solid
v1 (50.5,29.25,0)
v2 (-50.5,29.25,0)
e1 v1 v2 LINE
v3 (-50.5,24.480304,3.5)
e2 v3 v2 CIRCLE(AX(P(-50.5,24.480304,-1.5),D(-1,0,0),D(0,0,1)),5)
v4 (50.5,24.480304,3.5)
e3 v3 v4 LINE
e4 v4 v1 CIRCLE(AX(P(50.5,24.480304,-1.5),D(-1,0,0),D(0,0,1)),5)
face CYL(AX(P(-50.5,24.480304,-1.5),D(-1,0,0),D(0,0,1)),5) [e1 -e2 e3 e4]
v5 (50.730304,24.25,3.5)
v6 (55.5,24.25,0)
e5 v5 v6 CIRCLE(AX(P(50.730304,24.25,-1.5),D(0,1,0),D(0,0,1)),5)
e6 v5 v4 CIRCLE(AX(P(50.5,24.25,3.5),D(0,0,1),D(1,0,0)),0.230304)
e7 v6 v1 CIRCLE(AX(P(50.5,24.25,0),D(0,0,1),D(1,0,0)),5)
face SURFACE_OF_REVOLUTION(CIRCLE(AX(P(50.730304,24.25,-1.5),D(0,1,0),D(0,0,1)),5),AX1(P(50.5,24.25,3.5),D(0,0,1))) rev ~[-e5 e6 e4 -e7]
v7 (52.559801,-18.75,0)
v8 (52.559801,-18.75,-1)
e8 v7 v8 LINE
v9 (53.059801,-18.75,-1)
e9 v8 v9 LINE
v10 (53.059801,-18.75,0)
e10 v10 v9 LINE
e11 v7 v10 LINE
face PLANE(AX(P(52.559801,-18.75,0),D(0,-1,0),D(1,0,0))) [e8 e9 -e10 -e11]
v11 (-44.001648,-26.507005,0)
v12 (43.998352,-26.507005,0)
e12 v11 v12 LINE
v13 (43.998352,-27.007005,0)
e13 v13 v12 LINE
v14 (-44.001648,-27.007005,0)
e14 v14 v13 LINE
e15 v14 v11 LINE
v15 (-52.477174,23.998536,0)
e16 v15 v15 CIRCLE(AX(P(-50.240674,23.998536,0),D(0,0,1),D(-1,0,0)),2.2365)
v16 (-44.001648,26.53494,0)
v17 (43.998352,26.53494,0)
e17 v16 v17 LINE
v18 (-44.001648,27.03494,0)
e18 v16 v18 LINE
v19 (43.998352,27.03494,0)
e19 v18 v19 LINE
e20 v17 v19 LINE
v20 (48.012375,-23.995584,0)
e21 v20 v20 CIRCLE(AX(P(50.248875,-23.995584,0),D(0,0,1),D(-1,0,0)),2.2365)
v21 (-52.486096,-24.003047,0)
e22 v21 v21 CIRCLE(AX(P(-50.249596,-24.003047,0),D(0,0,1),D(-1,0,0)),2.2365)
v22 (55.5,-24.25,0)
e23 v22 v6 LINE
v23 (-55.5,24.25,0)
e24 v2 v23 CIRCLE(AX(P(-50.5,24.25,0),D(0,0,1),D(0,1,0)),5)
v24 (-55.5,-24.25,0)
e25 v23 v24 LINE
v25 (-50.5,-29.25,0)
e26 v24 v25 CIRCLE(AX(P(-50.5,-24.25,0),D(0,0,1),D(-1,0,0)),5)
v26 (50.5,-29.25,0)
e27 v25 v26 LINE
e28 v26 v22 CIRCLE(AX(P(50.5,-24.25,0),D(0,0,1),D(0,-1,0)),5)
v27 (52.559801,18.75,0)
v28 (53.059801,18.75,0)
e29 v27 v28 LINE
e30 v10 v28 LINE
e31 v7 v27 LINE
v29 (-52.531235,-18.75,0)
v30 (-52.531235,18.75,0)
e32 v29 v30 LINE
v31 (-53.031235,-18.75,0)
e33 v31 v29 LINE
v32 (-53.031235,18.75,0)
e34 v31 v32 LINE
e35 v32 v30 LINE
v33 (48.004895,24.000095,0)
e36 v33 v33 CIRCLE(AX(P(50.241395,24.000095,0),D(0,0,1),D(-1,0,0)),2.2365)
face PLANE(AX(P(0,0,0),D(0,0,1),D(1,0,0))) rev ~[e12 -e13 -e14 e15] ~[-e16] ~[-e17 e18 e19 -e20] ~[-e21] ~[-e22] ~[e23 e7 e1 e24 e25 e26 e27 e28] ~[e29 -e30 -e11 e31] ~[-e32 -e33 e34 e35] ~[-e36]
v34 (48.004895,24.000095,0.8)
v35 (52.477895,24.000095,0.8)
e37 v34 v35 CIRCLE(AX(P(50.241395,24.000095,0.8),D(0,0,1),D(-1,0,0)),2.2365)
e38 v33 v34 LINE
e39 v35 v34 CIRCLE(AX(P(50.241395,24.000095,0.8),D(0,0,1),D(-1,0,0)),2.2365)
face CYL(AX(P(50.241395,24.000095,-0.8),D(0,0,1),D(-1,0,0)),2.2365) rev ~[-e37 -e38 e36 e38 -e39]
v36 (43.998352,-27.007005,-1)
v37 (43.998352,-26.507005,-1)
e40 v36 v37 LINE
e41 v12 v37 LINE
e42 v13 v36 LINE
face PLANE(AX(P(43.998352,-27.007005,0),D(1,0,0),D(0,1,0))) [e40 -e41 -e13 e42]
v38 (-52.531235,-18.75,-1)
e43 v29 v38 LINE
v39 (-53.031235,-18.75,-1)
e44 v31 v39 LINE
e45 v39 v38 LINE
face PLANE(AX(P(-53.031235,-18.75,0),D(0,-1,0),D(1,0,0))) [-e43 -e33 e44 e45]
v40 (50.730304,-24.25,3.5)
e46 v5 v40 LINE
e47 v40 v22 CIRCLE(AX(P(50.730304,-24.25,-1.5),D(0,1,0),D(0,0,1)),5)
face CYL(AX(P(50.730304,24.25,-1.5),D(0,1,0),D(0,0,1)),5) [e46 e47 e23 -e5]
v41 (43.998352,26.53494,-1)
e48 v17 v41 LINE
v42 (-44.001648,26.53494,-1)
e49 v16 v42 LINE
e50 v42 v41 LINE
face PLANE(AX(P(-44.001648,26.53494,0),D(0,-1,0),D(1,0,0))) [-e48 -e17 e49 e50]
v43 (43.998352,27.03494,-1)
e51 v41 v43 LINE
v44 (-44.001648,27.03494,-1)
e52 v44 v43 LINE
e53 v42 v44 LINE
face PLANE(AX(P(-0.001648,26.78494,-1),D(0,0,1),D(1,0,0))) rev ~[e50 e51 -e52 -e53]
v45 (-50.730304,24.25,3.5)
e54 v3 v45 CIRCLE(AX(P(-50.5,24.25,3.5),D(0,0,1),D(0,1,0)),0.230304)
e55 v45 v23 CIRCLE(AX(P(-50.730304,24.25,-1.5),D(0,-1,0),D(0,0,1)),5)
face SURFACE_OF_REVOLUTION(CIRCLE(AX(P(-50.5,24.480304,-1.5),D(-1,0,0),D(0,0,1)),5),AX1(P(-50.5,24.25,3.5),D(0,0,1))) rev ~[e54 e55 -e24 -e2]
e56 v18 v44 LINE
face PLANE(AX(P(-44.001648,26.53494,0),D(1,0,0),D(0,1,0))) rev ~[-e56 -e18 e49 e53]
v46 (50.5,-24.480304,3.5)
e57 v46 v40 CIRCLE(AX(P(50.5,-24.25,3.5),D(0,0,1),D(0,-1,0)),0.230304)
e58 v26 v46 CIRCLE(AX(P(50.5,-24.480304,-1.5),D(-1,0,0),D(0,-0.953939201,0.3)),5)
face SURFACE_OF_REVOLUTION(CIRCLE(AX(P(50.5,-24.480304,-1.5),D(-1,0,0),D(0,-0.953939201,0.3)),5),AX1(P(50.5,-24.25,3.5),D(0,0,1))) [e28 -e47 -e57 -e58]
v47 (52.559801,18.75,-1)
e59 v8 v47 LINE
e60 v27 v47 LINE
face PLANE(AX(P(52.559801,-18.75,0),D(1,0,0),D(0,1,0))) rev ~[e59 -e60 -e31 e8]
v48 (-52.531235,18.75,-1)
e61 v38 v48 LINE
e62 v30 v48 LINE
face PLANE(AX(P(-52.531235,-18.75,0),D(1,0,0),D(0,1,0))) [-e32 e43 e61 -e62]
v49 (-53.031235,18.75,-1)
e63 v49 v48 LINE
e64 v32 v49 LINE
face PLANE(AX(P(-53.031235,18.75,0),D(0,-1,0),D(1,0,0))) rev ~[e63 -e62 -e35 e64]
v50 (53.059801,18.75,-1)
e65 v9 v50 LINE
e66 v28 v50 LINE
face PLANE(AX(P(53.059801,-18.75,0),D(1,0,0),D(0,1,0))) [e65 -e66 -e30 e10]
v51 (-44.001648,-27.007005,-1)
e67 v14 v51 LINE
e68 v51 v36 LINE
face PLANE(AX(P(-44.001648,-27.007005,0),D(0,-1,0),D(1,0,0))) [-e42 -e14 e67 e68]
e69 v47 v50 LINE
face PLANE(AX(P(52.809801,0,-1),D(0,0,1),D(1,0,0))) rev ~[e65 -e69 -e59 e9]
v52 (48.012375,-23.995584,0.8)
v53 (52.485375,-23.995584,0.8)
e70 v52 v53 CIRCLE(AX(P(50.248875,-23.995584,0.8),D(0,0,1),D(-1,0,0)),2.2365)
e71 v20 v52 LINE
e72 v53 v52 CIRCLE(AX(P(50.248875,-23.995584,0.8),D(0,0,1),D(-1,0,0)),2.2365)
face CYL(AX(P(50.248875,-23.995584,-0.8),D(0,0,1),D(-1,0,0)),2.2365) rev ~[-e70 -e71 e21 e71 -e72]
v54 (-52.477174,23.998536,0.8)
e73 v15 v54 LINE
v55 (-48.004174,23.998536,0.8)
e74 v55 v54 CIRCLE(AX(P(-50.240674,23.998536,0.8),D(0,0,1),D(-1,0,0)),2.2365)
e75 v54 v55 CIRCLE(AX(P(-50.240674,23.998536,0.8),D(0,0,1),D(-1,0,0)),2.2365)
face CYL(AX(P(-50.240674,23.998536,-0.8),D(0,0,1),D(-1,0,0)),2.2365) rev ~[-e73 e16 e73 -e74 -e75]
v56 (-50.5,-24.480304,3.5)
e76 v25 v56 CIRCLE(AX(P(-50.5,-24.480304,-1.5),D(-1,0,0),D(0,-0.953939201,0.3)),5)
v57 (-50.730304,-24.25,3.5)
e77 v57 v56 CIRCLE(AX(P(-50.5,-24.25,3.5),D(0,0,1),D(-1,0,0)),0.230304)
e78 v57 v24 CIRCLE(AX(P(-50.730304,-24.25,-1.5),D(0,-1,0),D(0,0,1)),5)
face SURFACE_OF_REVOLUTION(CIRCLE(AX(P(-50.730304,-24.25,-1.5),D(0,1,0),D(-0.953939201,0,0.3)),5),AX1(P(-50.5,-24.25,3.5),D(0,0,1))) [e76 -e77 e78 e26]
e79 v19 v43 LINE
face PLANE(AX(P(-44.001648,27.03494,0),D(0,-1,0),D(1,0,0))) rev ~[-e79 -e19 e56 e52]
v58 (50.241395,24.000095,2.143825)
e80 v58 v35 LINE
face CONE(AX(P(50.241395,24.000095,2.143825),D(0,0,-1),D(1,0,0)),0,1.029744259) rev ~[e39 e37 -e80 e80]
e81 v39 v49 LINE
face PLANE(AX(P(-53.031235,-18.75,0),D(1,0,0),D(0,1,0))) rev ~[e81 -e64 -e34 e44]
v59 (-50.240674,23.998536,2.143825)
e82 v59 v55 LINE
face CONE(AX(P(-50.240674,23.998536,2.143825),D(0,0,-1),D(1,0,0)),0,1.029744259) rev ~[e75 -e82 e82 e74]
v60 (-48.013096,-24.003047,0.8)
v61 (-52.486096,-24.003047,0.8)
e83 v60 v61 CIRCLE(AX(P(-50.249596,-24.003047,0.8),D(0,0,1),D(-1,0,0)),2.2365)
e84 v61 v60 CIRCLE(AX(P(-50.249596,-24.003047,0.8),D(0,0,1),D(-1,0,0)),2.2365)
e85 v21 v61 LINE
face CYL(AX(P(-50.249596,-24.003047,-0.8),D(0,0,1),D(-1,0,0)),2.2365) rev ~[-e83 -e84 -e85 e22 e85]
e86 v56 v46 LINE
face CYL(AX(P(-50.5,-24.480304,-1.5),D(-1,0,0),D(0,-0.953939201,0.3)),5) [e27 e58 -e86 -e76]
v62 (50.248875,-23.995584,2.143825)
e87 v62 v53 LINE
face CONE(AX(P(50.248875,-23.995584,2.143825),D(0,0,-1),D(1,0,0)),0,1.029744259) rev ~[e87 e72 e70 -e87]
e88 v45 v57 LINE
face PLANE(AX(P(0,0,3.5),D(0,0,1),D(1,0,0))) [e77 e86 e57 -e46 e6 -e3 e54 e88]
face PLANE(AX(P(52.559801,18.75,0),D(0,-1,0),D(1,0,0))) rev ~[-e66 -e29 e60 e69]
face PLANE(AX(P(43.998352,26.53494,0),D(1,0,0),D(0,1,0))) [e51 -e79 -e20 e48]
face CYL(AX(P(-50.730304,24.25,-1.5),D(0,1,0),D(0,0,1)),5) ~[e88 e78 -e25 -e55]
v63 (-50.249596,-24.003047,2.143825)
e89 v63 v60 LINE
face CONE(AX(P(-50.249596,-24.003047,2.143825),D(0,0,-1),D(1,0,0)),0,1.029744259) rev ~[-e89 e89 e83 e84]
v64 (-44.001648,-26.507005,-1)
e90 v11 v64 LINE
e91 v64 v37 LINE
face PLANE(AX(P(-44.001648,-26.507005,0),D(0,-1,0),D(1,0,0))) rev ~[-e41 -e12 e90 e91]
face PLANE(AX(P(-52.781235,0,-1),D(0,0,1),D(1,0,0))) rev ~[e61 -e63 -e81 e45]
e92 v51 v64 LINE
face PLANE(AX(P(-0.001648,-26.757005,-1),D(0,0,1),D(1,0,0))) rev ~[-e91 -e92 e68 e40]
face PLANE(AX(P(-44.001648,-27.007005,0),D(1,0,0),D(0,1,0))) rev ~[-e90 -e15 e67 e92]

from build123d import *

# Parameters (mm, degrees)
F1_DEPTH     = 3.5
F5_D         = 4.473
F5_DEPTH     = 0.8
F5_TIP       = 1.3438247745
F6_T1_DEPTH  = 101
F6_T3_DEPTH  = 48.5
F6_T6_ANGLE  = 90
F6_T8_ANGLE  = 90
F6_T10_ANGLE = 90
F6_T12_ANGLE = 90
F8_W         = 0.5
F8_H         = 37.5
F8_W_2       = 88
F8_H_2       = 0.5
F9_DEPTH     = 1


# Not quite as in the source:
# - a fillet or chamfer that OpenCascade refuses, or shapes differently, is made with other operations: its cross-section is extruded or revolved along the edge and cut away or added


with BuildPart() as f1:
    # F0 (on Top) → F1 (new body)
    with BuildSketch(Plane.XY):
        with BuildLine():
            Line((-50.5, -29.25), (50.5, -29.25))
            ThreePointArc((50.5, -29.25), (54.0355339059, -27.7855339059), (55.5, -24.25))
            Line((55.5, -24.25), (55.5, 24.25))
            ThreePointArc((55.5, 24.25), (54.0355339059, 27.7855339059), (50.5, 29.25))
            Line((50.5, 29.25), (-50.5, 29.25))
            ThreePointArc((-50.5, 29.25), (-54.0355339059, 27.7855339059), (-55.5, 24.25))
            Line((-55.5, 24.25), (-55.5, -24.25))
            ThreePointArc((-55.5, -24.25), (-54.0355339059, -27.7855339059), (-50.5, -29.25))
        make_face()
    extrude(amount=F1_DEPTH)

    # F5
    with Locations(Plane(origin=(0, 0, 0), x_dir=(1, 0, 0), z_dir=(0, 0, -1))):
        with Locations((-50.2406740561, -23.9985361695), (-50.2495961264, 24.0030474961), (50.2488752827, 23.995583877), (50.2413948998, -24.0000952035)):
            Hole(F5_D / 2, depth=F5_DEPTH)
            with Locations((0, 0, -(F5_DEPTH + F5_TIP / 2))):  # 118° drill point
                Cone(0, F5_D / 2, F5_TIP, mode=Mode.SUBTRACT)

    # F6: fillet of radius 5 on 1 edges, made by hand

    # F6_s2 → F6_t1 (cut)
    with BuildSketch(Plane.YZ.offset(-50.5)):
        with BuildLine():
            ThreePointArc((-29.25, 0), (-27.4383438845, 2.5311288741), (-24.4803039929, 3.5))
            Line((-24.4803039929, 3.5), (-29.25, 3.5))
            Line((-29.25, 3.5), (-29.25, 0))
        make_face()
        with BuildLine():
            ThreePointArc((24.4803039929, 3.5), (27.4383438845, 2.5311288741), (29.25, 0))
            Line((29.25, 0), (29.25, 3.5))
            Line((29.25, 3.5), (24.4803039929, 3.5))
        make_face()
    extrude(amount=F6_T1_DEPTH, mode=Mode.SUBTRACT)

    # F6_s4 → F6_t3 (cut)
    with BuildSketch(Plane.XZ.offset(-24.25)):
        with BuildLine():
            ThreePointArc((50.7303039929, 3.5), (53.6883438845, 2.5311288741), (55.5, 0))
            Line((55.5, 0), (55.5, 3.5))
            Line((55.5, 3.5), (50.7303039929, 3.5))
        make_face()
        with BuildLine():
            ThreePointArc((-50.7303039929, 3.5), (-53.6883438845, 2.5311288741), (-55.5, 0))
            Line((-55.5, 0), (-55.5, 3.5))
            Line((-55.5, 3.5), (-50.7303039929, 3.5))
        make_face()
    extrude(amount=F6_T3_DEPTH, mode=Mode.SUBTRACT)

    # F6_s5 → F6_t6 (revolve, cut)
    with BuildSketch(Plane.XZ.offset(24.25)):
        with BuildLine():
            ThreePointArc((-55.5, 0), (-53.6883438845, 2.5311288741), (-50.7303039929, 3.5))
            Line((-50.7303039929, 3.5), (-55.5, 3.5))
            Line((-55.5, 3.5), (-55.5, 0))
        make_face()
    revolve(axis=Axis((-50.5, -24.25, 3.5), (0, 0, 1)), revolution_arc=F6_T6_ANGLE, mode=Mode.SUBTRACT)

    # F6_s7 → F6_t8 (revolve, cut)
    with BuildSketch(Plane.YZ.offset(50.5)):
        with BuildLine():
            ThreePointArc((-29.25, 0), (-27.4383438845, 2.5311288741), (-24.4803039929, 3.5))
            Line((-24.4803039929, 3.5), (-29.25, 3.5))
            Line((-29.25, 3.5), (-29.25, 0))
        make_face()
    revolve(axis=Axis((50.5, -24.25, 3.5), (0, 0, 1)), revolution_arc=F6_T8_ANGLE, mode=Mode.SUBTRACT)

    # F6_s9 → F6_t10 (revolve, cut)
    with BuildSketch(Plane.XZ.offset(-24.25)):
        with BuildLine():
            ThreePointArc((50.7303039929, 3.5), (53.6883438845, 2.5311288741), (55.5, 0))
            Line((55.5, 0), (55.5, 3.5))
            Line((55.5, 3.5), (50.7303039929, 3.5))
        make_face()
    revolve(axis=Axis((50.5, 24.25, 3.5), (0, 0, 1)), revolution_arc=F6_T10_ANGLE, mode=Mode.SUBTRACT)

    # F6_s11 → F6_t12 (revolve, cut)
    with BuildSketch(Plane.YZ.offset(-50.5)):
        with BuildLine():
            ThreePointArc((24.4803039929, 3.5), (27.4383438845, 2.5311288741), (29.25, 0))
            Line((29.25, 0), (29.25, 3.5))
            Line((29.25, 3.5), (24.4803039929, 3.5))
        make_face()
    revolve(axis=Axis((-50.5, 24.25, 3.5), (0, 0, 1)), revolution_arc=F6_T12_ANGLE, mode=Mode.SUBTRACT)

    # F8 (on Top) → F9 (join)
    with BuildSketch(Plane.XY):
        with Locations((-52.7812354267, 0)):
            Rectangle(F8_W, F8_H)
        with Locations((-0.0016481951, -26.7570052035)):
            Rectangle(F8_W_2, F8_H_2)
        with Locations((52.8098009527, 0)):
            Rectangle(F8_W, F8_H)
        with Locations((-0.0016481951, 26.78494009)):
            Rectangle(F8_W_2, F8_H_2)
    extrude(amount=-F9_DEPTH)


solid = f1.part
